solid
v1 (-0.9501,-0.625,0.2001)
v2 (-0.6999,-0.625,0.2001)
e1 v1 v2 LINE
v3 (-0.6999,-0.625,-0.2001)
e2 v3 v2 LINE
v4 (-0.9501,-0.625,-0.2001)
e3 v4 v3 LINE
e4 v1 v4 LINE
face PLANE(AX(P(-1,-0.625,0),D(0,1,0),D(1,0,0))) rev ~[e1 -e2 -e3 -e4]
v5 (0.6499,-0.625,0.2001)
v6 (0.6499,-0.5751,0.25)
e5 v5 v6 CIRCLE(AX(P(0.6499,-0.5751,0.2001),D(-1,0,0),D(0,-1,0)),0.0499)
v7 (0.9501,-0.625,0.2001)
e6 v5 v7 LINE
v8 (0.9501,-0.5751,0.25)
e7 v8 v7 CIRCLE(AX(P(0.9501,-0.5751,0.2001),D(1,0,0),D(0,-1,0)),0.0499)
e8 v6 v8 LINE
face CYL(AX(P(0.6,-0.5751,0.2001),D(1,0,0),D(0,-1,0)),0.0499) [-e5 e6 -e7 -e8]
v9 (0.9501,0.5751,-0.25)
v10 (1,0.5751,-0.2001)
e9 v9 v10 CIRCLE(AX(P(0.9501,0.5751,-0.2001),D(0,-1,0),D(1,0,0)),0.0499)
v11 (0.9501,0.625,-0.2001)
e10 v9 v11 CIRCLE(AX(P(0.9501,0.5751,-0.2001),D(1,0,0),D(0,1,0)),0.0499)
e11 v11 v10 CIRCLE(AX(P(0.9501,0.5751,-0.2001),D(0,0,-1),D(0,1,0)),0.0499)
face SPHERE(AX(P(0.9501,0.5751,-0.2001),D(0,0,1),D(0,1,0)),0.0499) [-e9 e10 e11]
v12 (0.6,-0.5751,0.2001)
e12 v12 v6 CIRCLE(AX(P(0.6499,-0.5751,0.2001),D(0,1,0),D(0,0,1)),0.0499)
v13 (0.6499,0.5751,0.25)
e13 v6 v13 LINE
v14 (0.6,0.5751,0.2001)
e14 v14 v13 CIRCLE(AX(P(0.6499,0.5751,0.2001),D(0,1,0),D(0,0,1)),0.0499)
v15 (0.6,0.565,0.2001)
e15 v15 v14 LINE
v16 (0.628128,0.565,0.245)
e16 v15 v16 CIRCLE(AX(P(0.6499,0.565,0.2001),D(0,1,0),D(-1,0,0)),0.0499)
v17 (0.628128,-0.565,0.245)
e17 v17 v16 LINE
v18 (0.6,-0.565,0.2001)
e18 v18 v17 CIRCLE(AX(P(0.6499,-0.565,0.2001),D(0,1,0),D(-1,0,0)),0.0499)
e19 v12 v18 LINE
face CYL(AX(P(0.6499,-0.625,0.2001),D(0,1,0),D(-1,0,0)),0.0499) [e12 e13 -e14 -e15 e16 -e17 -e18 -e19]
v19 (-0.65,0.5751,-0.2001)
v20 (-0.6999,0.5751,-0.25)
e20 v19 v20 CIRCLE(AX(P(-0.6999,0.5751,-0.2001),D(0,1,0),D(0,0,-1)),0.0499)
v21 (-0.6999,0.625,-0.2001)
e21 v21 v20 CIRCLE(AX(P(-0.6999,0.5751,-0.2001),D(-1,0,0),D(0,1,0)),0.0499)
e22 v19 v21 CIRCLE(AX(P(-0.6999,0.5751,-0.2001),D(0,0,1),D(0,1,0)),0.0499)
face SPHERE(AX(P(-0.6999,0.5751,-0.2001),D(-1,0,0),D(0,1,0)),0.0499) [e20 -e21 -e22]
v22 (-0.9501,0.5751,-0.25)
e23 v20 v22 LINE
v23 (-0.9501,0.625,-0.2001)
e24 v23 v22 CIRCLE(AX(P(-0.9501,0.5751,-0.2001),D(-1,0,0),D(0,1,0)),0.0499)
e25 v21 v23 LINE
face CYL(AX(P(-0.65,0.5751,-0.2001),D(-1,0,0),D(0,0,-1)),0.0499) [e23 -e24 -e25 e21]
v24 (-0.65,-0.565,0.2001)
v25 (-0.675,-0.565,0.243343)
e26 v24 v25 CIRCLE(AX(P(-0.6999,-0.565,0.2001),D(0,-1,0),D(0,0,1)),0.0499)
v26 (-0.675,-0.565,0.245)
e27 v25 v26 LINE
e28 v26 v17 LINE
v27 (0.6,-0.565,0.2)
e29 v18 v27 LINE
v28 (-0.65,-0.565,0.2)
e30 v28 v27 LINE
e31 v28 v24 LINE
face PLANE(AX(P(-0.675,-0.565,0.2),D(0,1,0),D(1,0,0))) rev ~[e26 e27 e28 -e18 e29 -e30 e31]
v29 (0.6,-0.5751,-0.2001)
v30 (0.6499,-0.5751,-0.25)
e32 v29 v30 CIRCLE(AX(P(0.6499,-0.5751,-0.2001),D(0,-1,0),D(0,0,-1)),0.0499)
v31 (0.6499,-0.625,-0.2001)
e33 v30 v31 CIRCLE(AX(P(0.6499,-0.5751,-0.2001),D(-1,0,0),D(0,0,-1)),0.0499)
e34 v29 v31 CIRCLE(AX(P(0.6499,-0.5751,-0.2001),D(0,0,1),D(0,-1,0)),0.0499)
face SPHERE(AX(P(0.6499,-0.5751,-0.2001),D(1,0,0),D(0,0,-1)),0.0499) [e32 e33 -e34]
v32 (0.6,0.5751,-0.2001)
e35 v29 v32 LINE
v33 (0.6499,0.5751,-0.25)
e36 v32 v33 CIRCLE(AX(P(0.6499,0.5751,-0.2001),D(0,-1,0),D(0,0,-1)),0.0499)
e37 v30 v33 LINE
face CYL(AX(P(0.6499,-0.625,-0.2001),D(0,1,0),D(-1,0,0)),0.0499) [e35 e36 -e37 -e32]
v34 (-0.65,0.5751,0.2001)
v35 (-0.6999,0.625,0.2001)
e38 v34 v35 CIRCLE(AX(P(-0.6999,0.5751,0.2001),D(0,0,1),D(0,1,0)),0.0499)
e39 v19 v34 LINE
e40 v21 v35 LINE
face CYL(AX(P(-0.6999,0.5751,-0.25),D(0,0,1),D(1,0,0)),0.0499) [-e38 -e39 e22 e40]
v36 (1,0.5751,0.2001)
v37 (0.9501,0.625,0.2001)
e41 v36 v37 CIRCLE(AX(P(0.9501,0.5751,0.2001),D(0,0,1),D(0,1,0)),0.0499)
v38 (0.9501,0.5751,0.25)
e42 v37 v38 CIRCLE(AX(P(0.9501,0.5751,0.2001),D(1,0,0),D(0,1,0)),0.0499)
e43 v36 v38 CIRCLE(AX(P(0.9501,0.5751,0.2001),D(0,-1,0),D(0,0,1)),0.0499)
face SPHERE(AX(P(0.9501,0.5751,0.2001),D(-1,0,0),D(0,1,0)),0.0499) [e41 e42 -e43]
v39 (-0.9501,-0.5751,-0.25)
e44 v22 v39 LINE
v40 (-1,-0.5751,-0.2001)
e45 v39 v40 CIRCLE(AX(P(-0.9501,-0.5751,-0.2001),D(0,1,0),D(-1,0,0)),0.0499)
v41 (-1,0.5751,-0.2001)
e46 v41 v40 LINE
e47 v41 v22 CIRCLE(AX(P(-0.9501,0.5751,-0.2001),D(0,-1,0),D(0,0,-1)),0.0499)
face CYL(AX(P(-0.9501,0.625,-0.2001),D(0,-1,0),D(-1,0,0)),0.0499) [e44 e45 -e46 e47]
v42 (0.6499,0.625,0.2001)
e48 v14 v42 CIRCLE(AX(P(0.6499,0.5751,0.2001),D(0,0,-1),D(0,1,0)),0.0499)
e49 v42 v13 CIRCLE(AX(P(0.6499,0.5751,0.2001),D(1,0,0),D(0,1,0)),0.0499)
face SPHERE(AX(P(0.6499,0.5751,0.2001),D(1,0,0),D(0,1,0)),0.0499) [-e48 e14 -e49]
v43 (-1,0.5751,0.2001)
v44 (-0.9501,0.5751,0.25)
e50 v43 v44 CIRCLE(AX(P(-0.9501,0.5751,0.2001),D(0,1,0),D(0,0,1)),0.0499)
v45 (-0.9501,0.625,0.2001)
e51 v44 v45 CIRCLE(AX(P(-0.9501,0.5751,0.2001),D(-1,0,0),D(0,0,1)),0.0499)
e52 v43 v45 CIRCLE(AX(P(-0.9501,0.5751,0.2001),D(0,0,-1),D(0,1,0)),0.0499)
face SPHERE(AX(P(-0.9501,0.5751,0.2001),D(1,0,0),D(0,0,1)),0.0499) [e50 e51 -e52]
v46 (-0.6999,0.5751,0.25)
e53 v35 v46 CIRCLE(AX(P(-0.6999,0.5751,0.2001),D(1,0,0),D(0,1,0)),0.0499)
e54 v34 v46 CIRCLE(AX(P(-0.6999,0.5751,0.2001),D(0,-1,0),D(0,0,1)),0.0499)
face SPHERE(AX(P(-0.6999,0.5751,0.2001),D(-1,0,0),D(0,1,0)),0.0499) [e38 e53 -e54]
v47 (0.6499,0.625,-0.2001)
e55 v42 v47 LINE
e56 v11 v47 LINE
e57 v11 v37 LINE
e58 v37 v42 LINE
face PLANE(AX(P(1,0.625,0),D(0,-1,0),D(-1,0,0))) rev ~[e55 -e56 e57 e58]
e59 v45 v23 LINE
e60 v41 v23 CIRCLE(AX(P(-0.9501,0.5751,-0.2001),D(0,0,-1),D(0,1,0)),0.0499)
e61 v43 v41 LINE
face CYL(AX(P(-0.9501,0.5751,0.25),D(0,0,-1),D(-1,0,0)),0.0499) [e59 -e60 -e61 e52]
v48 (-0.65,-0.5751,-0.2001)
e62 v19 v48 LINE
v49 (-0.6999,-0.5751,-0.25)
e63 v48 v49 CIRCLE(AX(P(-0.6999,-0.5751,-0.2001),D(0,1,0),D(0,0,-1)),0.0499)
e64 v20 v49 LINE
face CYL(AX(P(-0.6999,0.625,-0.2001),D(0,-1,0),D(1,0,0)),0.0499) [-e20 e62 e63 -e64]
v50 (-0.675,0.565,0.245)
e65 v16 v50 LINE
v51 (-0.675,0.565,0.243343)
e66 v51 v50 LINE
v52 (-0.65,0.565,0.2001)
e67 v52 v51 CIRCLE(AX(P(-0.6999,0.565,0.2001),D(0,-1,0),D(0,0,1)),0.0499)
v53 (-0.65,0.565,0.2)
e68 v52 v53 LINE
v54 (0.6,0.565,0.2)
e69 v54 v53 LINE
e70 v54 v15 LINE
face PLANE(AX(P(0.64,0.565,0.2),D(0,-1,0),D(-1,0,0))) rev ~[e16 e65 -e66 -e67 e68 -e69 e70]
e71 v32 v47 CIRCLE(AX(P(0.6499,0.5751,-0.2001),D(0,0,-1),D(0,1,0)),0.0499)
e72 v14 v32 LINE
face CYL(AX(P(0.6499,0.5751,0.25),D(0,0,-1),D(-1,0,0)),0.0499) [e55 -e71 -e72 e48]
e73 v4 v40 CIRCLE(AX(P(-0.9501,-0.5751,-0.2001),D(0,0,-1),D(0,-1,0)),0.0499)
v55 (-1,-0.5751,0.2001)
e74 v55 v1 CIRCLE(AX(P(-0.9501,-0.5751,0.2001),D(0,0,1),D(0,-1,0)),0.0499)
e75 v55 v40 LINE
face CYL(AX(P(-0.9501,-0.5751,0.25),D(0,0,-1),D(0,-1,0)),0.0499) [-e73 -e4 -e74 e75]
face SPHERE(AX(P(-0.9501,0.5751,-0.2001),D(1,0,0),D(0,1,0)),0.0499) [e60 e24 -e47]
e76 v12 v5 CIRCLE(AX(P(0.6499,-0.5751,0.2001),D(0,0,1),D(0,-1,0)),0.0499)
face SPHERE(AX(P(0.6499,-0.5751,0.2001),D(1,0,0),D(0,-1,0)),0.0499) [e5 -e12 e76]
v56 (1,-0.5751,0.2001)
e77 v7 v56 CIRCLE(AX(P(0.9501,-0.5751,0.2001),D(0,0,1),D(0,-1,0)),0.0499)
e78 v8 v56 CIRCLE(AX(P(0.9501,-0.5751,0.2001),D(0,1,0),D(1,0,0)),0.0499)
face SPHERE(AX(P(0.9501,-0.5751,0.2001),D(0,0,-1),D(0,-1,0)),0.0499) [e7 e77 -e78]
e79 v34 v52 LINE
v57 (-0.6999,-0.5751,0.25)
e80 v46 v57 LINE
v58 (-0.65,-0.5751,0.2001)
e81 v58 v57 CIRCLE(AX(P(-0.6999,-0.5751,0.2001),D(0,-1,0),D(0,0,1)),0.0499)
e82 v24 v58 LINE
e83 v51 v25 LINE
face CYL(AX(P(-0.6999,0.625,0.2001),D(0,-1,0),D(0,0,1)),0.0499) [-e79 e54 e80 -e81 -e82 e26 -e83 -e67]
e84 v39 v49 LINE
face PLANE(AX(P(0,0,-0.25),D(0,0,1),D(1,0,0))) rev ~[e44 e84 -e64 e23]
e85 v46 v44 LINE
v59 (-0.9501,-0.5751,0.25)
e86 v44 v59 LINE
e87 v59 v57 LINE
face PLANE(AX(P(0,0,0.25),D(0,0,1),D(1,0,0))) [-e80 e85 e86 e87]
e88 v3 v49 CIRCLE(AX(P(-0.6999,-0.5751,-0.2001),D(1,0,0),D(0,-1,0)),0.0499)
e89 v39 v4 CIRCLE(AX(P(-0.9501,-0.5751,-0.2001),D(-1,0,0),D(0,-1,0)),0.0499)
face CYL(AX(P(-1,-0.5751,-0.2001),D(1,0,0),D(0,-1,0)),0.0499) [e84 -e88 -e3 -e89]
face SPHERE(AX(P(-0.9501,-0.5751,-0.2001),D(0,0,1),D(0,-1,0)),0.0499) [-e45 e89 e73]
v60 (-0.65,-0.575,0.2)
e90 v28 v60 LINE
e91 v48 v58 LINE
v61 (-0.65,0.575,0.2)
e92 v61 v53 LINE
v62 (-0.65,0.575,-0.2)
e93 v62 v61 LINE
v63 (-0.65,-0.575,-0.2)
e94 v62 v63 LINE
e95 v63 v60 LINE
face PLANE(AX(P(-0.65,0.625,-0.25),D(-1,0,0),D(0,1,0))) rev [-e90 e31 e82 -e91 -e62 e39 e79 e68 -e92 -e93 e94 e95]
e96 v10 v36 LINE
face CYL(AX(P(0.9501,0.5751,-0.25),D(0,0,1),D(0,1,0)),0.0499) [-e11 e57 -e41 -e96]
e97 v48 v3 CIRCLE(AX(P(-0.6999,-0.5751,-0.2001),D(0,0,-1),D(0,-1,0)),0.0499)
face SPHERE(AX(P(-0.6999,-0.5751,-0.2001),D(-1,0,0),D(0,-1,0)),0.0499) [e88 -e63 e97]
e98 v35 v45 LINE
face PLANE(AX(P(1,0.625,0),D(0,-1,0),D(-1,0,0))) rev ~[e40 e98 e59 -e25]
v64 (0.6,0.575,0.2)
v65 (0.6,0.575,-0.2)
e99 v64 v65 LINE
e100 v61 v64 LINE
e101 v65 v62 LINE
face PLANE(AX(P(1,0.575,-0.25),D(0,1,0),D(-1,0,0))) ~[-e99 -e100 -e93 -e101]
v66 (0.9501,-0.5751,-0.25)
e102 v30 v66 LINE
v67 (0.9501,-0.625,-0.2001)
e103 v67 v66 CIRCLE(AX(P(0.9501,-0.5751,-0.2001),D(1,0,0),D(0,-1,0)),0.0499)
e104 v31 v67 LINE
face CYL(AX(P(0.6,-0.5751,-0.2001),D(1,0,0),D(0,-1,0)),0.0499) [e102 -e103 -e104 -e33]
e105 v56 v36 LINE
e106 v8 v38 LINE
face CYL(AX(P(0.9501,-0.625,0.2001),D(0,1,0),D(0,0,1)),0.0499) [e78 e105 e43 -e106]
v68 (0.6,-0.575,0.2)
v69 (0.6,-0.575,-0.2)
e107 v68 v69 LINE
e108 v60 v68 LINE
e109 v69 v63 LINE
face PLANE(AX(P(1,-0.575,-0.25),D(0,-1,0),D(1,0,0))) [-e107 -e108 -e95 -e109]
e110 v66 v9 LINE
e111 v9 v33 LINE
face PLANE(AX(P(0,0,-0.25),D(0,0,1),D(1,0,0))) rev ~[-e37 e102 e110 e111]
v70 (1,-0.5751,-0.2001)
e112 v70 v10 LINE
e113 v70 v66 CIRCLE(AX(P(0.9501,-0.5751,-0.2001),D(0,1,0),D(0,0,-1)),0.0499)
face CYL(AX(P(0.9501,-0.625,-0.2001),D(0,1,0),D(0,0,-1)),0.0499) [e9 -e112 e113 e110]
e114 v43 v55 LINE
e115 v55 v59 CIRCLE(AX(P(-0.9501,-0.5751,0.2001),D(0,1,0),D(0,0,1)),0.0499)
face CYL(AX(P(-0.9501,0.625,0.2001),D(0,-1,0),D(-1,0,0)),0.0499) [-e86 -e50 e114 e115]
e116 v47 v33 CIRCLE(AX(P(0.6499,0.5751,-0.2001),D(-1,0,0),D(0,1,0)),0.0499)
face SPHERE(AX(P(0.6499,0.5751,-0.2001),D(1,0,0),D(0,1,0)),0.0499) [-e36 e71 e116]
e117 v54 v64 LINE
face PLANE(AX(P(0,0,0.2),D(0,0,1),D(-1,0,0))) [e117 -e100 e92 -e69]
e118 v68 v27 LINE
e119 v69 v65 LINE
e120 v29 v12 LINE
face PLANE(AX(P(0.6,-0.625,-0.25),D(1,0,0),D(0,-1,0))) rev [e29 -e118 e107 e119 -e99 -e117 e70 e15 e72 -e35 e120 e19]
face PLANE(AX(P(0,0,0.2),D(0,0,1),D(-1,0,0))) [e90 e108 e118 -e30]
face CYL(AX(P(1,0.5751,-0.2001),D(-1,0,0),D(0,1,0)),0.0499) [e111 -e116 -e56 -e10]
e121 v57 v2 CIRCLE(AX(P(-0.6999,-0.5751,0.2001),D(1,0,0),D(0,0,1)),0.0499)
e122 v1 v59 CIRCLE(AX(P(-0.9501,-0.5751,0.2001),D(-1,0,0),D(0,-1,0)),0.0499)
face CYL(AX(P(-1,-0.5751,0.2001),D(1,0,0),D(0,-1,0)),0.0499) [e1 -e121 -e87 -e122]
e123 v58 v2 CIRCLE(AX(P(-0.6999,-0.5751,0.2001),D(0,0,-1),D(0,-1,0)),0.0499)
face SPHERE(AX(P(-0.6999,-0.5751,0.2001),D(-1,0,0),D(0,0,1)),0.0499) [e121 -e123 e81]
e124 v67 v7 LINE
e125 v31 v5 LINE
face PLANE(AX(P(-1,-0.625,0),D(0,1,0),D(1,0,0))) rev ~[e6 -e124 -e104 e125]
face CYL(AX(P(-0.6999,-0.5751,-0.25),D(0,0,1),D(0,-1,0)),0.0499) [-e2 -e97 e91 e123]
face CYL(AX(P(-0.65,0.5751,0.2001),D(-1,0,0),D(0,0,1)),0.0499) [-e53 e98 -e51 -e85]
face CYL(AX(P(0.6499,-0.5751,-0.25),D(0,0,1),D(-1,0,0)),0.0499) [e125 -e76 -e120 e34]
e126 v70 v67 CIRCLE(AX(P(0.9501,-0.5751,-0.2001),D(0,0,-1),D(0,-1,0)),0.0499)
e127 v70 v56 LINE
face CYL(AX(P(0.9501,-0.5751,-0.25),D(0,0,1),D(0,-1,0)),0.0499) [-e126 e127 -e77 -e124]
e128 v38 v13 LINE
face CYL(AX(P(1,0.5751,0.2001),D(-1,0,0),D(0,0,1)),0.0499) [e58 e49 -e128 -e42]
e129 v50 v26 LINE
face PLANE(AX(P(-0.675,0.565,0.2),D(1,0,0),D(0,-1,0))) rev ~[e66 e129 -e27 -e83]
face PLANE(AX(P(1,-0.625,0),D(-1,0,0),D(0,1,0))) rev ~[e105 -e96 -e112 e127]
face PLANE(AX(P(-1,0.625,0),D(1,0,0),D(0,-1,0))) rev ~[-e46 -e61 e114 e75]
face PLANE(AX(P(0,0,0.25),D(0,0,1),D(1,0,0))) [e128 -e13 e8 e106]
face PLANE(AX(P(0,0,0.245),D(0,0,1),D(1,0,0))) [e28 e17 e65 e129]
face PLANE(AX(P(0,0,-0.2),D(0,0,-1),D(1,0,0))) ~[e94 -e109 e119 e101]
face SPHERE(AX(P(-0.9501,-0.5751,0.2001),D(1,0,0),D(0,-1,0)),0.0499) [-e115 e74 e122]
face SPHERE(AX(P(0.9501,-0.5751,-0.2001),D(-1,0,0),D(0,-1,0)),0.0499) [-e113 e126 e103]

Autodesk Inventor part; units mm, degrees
ref_plane "YZ Plane" through (0, 0, 0) normal (1, 0, 0) x (0, 1, 0)
ref_plane "XZ Plane" through (0, 0, 0) normal (0, 1, 0) x (-1, 0, 0)
ref_plane "XY Plane" through (0, 0, 0) normal (0, 0, 1) x (1, 0, 0)
sketch "Sketch1" plane through (0, 0, 0) normal (0, 0, 1) x (1, 0, 0)
  line L0 (1, 0.625) -> (-1, 0.625)
  line L1 (-1, 0.625) -> (-1, -0.625)
  line L2 (-1, -0.625) -> (1, -0.625)
  line L3 (1, -0.625) -> (1, 0.625)
  line L4 (1, 0.625) -> (-1, -0.625) construction
  line L5 (-1, 0.625) -> (1, -0.625) construction
  point P0 (0, 0)
  dimension "d0" = 2
  dimension "d1" = 1.25
sketch "Sketch1 outline for Extrusion1" plane through (0, 0, 0) normal (0, 0, 1) x (1, 0, 0)
  line L0 (1, -0.625) -> (1, 0.625)
  line L1 (-1, -0.625) -> (1, -0.625)
  line L2 (-1, 0.625) -> (-1, -0.625)
  line L3 (1, 0.625) -> (-1, 0.625)
extrude "Extrusion1" add sketch "Sketch1 outline for Extrusion1" along normal mid plane 0.5
sketch "Sketch2" plane through (0, 0, 0.25) normal (0, 0, 1) x (-1, 0, 0)
  line L0 (0.65, 0.624281) -> (0.65, -0.625)
  line L1 (-1, 0.625) -> (-0.6, 0.625)
  line L2 (-0.6, 0.625) -> (-0.6, -0.625)
  line L3 (-0.6, -0.625) -> (-1, -0.625)
  line L4 (-1, -0.625) -> (-1, 0.625)
  line L5 (-0.6, 0.625) -> (0.65, 0.625)
  line L6 (0.65, 0.625) -> (0.65, -0.625)
  line L7 (0.65, -0.625) -> (-0.6, -0.625)
  line L8 (-0.6, -0.625) -> (-0.6, 0.625)
  line L9 (1, -0.625) -> (1, 0.625)
  line L10 (-1, -0.625) -> (1, -0.625)
  line L11 (1, -0.625) -> (1, 0.625)
  line L12 (1, 0.625) -> (-1, 0.625)
  line L13 (-1, 0.625) -> (-1, -0.625)
  point P0 (0, 0)
  point P1 (0, -0.625)
  dimension "d5" = 0.4
  dimension "d11" = 0.35
sketch "Sketch2 outline for Extrusion2" plane through (0, 0, 0.25) normal (0, 0, 1) x (-1, 0, 0)
  line L0 (-0.6, -0.625) -> (0.65, -0.625)
  line L1 (-0.6, 0.625) -> (-0.6, -0.625)
  line L2 (0.65, 0.625) -> (-0.6, 0.625)
  line L3 (0.65, -0.625) -> (0.65, 0.625)
extrude "Extrusion2" cut sketch "Sketch2 outline for Extrusion2" against normal blind 0.05
mirror "Mirror1" about plane through (0, 0, 0) normal (0, 0, 1) of "Extrusion2"
sketch "Sketch3" plane through (1, -0.625, -0.25) normal (0, -1, 0) x (1, 0, 0)
  line L0 (-1.65, 0.45) -> (-0.4, 0.45)
  line L1 (-0.4, 0.45) -> (-0.4, 0.05)
  line L2 (-0.4, 0.05) -> (-1.65, 0.05)
  line L3 (-1.65, 0.05) -> (-1.65, 0.45)
  point P0 (-1, 0.25)
sketch "Sketch3 outline for Extrusion3" plane through (1, -0.625, -0.25) normal (0, -1, 0) x (1, 0, 0)
  line L0 (-1.65, 0.45) -> (-0.4, 0.45)
  line L1 (-0.4, 0.45) -> (-0.4, 0.05)
  line L2 (-0.4, 0.05) -> (-1.65, 0.05)
  line L3 (-1.65, 0.05) -> (-1.65, 0.45)
extrude "Extrusion3" cut sketch "Sketch3 outline for Extrusion3" against normal blind 0.05
mirror "Mirror2" about plane through (0, 0, 0) normal (0, 1, 0) of "Extrusion3"
fillet "Fillet1" radius 0.05 24 edges at (0.8, 0.625, 0.25) (1, 0.625, 0) (0.8, 0.625, -0.25) (0.8, -0.625, -0.25) (1, -0.625, 0) (0.8, -0.625, 0.25) (-0.825, -0.625, 0.25) (-1, -0.625, 0) (-0.825, -0.625, -0.25) (1, 0, -0.25) (1, 0, 0.25) (-0.825, 0.625, 0.25) (-1, 0, 0.25) (-0.825, 0.625, -0.25) (-1, 0.625, 0) (-1, 0, -0.25) (-0.65, 0.625, 0) (-0.65, 0, 0.25) (-0.65, -0.625, 0) (-0.65, 0, -0.25) (0.6, 0.625, 0) (0.6, 0, -0.25) (0.6, -0.625, 0) (0.6, 0, 0.25)
sketch "Sketch4" plane through (0, 0, 0.2) normal (0, 0, 1) x (1, 0, 0)
  line L0 (0.6, 0.575) -> (-0.65, 0.575) projected
  line L1 (-0.65, -0.575) -> (-0.65, 0.575) projected
  line L2 (-0.65, -0.575) -> (0.6, -0.575) projected
  line L3 (0.6, 0.575) -> (0.6, -0.575) projected
  line L4 (-0.65, 0.575) -> (-0.7, 0.575) projected
  line L5 (-0.7, 0.575) -> (-0.7, -0.575) projected
  line L6 (-0.7, -0.575) -> (-0.65, -0.575) projected
  line L7 (-0.65, -0.575) -> (-0.65, 0.575) projected
  line L8 (0.6, -0.575) -> (0.65, -0.575) projected
  line L9 (0.65, -0.575) -> (0.65, 0.575) projected
  line L10 (0.65, 0.575) -> (0.6, 0.575) projected
  line L11 (0.6, 0.575) -> (0.6, -0.575) projected
  line L12 (-0.7, -0.575) -> (0.65, -0.575)
  line L13 (0.65, -0.575) -> (0.65, 0.575)
  line L14 (0.65, 0.575) -> (-0.7, 0.575)
  line L15 (-0.7, 0.575) -> (-0.7, -0.575)
  line L16 (-0.675, -0.565) -> (0.64, -0.565)
  line L17 (0.64, -0.565) -> (0.64, 0.565)
  line L18 (0.64, 0.565) -> (-0.675, 0.565)
  line L19 (-0.675, 0.565) -> (-0.675, -0.565)
  point P0 (0, 0)
  dimension "d12" = 0.01
  dimension "d13" = 0.01
  dimension "d14" = 0.01
  dimension "d15" = 0.025
sketch "Sketch4 outline for Extrusion4" plane through (0, 0, 0.2) normal (0, 0, 1) x (1, 0, 0)
  line L0 (-0.675, 0.565) -> (-0.675, -0.565)
  line L1 (0.64, 0.565) -> (-0.675, 0.565)
  line L2 (0.64, -0.565) -> (0.64, 0.565)
  line L3 (-0.675, -0.565) -> (0.64, -0.565)
extrude "Extrusion4" add sketch "Sketch4 outline for Extrusion4" along normal blind 0.045
equation "\"d13\" = d12"
equation "\"d14\" = d13"
properties part number "0805 Resistor"
